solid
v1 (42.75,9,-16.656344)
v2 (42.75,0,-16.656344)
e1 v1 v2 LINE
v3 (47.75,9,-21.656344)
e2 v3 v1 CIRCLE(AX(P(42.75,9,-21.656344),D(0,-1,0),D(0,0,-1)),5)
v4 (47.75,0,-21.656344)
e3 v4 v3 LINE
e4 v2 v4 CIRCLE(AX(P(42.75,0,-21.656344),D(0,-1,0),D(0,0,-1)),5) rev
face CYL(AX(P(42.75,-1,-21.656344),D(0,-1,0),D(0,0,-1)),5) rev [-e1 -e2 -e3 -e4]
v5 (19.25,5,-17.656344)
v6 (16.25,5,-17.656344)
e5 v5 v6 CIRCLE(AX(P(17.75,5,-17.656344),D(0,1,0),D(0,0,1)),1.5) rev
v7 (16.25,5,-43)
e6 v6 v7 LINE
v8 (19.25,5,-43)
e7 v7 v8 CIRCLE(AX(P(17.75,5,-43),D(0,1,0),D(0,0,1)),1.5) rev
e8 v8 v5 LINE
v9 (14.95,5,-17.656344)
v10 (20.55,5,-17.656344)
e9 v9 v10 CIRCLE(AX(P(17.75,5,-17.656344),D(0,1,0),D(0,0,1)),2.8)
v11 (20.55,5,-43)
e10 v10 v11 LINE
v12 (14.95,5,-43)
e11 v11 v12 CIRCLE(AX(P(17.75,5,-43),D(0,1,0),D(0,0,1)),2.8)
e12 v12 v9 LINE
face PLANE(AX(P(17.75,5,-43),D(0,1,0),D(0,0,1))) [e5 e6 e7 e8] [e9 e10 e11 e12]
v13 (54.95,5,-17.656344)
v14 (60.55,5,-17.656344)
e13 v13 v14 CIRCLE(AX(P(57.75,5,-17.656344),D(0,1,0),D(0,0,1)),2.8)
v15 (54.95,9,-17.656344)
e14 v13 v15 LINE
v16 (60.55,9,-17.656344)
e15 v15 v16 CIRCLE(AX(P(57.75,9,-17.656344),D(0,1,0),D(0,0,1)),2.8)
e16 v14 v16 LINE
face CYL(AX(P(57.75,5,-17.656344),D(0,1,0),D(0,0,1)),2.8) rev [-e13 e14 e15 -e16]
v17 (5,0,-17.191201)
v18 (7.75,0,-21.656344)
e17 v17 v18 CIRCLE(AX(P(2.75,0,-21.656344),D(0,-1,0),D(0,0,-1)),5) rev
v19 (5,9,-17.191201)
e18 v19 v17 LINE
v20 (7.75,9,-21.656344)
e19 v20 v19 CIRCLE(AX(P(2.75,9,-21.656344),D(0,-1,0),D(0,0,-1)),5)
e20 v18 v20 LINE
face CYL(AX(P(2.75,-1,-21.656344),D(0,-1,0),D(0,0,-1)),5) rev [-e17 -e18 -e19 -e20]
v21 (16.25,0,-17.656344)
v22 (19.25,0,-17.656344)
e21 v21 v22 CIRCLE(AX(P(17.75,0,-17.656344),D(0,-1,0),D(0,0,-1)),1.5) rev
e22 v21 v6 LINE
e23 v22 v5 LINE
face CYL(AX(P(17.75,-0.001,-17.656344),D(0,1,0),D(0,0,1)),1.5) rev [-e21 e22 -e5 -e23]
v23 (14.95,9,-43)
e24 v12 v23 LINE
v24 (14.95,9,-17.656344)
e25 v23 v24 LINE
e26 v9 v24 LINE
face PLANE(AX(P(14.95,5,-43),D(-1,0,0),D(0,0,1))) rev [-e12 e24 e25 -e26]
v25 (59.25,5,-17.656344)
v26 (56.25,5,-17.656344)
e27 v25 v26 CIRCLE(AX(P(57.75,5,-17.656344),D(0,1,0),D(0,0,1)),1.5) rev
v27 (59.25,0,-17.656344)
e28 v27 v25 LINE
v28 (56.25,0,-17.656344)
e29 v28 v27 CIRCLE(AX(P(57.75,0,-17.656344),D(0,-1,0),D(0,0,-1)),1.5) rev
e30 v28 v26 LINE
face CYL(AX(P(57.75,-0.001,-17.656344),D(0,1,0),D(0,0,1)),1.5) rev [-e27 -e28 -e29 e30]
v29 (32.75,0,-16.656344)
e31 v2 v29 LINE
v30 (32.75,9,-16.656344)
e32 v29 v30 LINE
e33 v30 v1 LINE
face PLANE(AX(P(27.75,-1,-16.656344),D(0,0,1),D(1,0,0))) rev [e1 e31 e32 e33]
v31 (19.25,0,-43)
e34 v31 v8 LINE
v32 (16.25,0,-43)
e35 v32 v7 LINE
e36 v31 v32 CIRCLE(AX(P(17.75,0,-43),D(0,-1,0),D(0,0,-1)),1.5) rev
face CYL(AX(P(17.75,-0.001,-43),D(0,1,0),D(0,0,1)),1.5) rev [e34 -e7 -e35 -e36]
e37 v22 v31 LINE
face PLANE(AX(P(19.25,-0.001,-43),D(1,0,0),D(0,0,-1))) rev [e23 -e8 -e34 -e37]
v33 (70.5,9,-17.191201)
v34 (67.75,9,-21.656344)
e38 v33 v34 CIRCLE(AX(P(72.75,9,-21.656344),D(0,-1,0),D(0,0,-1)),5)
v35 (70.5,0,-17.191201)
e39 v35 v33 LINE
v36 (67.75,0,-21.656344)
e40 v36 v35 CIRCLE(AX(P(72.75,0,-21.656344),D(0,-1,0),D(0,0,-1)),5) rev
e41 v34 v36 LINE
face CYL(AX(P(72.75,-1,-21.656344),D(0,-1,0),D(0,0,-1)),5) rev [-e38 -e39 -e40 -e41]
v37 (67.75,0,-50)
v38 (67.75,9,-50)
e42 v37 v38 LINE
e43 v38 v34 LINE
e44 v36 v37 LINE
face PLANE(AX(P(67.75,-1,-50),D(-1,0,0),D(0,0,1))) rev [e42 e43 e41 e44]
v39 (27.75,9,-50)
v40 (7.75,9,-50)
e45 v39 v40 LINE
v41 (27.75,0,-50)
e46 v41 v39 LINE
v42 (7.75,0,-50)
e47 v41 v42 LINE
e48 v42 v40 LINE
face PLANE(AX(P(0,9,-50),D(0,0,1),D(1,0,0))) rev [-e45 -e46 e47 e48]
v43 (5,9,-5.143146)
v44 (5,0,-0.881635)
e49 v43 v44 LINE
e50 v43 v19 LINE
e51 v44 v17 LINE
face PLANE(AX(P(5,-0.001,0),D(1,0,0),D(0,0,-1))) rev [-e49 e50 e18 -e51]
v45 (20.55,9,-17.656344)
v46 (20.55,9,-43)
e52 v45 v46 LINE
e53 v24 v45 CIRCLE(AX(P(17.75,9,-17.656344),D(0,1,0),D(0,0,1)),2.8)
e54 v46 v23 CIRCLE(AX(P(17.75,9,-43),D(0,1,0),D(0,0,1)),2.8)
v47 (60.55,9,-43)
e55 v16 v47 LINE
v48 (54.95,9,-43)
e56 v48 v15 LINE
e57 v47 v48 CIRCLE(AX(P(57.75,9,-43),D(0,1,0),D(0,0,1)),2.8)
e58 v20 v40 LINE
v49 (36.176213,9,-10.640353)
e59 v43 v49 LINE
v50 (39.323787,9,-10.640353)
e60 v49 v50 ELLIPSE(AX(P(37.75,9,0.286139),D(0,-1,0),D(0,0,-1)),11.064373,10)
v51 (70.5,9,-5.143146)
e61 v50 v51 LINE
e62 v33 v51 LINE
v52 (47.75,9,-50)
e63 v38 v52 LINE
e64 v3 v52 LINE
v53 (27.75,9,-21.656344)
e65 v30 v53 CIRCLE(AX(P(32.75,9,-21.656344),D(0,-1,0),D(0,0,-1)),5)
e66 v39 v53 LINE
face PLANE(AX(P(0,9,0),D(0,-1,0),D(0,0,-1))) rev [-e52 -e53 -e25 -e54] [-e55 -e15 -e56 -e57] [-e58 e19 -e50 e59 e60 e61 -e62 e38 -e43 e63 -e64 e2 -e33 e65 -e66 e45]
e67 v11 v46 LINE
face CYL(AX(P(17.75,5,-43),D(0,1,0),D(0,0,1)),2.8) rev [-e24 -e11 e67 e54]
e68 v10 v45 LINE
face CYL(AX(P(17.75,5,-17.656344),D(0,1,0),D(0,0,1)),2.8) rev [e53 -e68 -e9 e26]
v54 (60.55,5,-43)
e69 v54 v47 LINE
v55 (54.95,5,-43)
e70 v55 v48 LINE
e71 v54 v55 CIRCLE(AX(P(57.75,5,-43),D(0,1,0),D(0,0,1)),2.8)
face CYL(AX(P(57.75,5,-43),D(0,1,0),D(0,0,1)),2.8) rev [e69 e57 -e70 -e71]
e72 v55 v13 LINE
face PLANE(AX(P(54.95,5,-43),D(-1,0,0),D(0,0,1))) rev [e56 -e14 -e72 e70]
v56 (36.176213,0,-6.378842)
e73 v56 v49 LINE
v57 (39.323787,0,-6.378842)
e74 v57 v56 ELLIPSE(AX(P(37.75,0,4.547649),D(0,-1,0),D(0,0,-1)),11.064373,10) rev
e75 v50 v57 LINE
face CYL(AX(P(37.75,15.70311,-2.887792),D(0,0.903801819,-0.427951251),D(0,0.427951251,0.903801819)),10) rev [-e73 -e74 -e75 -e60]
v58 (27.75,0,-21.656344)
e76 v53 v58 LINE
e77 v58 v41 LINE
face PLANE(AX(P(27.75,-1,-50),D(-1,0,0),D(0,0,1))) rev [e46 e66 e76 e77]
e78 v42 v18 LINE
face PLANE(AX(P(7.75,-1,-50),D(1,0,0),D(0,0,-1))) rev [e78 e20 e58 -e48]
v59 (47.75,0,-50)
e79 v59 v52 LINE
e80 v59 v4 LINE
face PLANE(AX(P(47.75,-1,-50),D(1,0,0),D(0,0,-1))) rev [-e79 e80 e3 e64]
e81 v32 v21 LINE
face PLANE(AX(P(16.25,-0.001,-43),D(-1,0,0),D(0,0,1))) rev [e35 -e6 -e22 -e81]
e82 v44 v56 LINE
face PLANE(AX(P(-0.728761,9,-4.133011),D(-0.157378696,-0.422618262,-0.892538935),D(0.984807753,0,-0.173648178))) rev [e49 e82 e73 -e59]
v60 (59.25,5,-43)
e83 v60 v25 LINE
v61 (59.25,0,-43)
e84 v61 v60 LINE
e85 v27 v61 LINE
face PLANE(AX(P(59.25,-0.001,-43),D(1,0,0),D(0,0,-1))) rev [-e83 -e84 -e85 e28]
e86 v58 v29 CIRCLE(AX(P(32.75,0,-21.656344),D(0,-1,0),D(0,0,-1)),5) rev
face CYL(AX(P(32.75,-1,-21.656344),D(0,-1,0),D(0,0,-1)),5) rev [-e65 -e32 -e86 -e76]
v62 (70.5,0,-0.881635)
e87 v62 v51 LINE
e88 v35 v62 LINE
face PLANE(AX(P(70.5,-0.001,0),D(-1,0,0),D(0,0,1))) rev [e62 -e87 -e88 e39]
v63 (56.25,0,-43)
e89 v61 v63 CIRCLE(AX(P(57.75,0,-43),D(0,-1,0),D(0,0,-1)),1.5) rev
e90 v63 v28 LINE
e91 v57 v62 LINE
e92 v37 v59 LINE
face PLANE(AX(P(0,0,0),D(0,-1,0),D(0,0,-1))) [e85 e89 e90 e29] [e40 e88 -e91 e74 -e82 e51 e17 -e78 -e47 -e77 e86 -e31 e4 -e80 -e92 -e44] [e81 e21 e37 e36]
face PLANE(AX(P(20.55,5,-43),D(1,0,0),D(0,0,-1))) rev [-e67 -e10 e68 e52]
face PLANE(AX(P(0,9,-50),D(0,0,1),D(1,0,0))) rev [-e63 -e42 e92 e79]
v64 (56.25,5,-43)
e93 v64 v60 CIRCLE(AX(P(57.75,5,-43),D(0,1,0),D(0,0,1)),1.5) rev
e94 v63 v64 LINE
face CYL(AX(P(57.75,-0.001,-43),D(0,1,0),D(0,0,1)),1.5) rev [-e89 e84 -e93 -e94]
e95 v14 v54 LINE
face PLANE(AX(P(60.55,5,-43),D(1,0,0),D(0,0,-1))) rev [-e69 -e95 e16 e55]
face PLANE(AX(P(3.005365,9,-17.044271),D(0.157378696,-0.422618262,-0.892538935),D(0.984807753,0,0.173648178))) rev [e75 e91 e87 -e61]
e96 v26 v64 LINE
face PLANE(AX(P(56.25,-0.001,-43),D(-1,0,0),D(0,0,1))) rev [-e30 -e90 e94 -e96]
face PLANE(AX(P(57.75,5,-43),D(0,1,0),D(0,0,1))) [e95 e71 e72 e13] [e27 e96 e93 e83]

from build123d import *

# Parameters (mm, degrees)
BOSS_EXTRUDE1_DEPTH = 9
CUT_EXTRUDE2_REACH  = 93.001
SKETCH5_W           = 20
SKETCH5_H           = 33.343656478
SKETCH5_W_2         = 7.75
CUT_EXTRUDE3_DEPTH  = 10
FILLET1_R           = 5
CUT_EXTRUDE4_DEPTH  = 4
CHAMFER1_SIZE       = 9
CHAMFER1_SIZE_2     = 4.196768923
FILLET2_R           = 10
CUT_EXTRUDE5_REACH  = 93.001
SKETCH7_W           = 5
SKETCH7_H           = 18.120809616


with BuildPart() as part:
    # Sketch1 → Boss-Extrude1 (new body)
    with BuildSketch(Plane(origin=(0, 0, 0), x_dir=(1, 0, 0), z_dir=(0, 1, 0))):
        Polygon((0, 0), (0, 50), (75.5, 50), (75.5, 0), (37.75, 6.656343522), align=None)
    extrude(amount=BOSS_EXTRUDE1_DEPTH)

    # Sketch4 → Cut-Extrude2 (cut, up to next)
    with BuildSketch(Plane(origin=(0, 9, 0), x_dir=(1, 0, 0), z_dir=(0, 1, 0)), mode=Mode.PRIVATE) as cut_extrude2_sk1:
        with BuildLine():
            Line((19.25, 43), (19.25, 17.656343522))
            ThreePointArc((19.25, 17.656343522), (17.75, 16.156343522), (16.25, 17.656343522))
            Line((16.25, 17.656343522), (16.25, 43))
            ThreePointArc((16.25, 43), (17.75, 44.5), (19.25, 43))
        make_face()
    cut_extrude2_tool1 = extrude(cut_extrude2_sk1.sketch, amount=-CUT_EXTRUDE2_REACH, mode=Mode.PRIVATE) & part.part
    # Sketch4 → Cut-Extrude2 (cut, up to next)
    with BuildSketch(Plane(origin=(0, 9, 0), x_dir=(1, 0, 0), z_dir=(0, 1, 0)), mode=Mode.PRIVATE) as cut_extrude2_sk2:
        with BuildLine():
            Line((59.25, 43), (59.25, 17.656343522))
            ThreePointArc((59.25, 17.656343522), (57.75, 16.156343522), (56.25, 17.656343522))
            Line((56.25, 17.656343522), (56.25, 43))
            ThreePointArc((56.25, 43), (57.75, 44.5), (59.25, 43))
        make_face()
    cut_extrude2_tool2 = extrude(cut_extrude2_sk2.sketch, amount=-CUT_EXTRUDE2_REACH, mode=Mode.PRIVATE) & part.part
    add(cut_extrude2_tool1.solids().sort_by_distance((17.75, 9, -30.328172))[0], mode=Mode.SUBTRACT)
    add(cut_extrude2_tool2.solids().sort_by_distance((57.75, 9, -30.328172))[0], mode=Mode.SUBTRACT)

    # Sketch5 → Cut-Extrude3 (cut)
    with BuildSketch(Plane(origin=(0, 9, 0), x_dir=(1, 0, 0), z_dir=(0, 1, 0))):
        with Locations((37.75, 33.328171761)):
            Rectangle(SKETCH5_W, SKETCH5_H)
        with Locations((71.625, 33.328171761)):
            Rectangle(SKETCH5_W_2, SKETCH5_H)
        with Locations((3.875, 33.328171761)):
            Rectangle(SKETCH5_W_2, SKETCH5_H)
    extrude(amount=-CUT_EXTRUDE3_DEPTH, mode=Mode.SUBTRACT)

    # Fillet1
    fillet1_edges = [part.edges().sort_by_distance(p)[0] for p in [
        (27.75, 4.5, -16.656343522),
        (47.75, 4.5, -16.656343522),
        (7.75, 4.5, -16.656343522),
        (67.75, 4.5, -16.656343522),
    ]]
    fillet(fillet1_edges, radius=FILLET1_R)

    # Sketch6 → Cut-Extrude4 (cut)
    with BuildSketch(Plane(origin=(0, 9, 0), x_dir=(1, 0, 0), z_dir=(0, 1, 0))):
        with BuildLine():
            Line((20.55, 43), (20.55, 17.656343522))
            ThreePointArc((20.55, 17.656343522), (17.75, 14.856343522), (14.95, 17.656343522))
            Line((14.95, 17.656343522), (14.95, 43))
            ThreePointArc((14.95, 43), (17.75, 45.8), (20.55, 43))
        make_face()
        with BuildLine():
            Line((60.55, 43), (60.55, 17.656343522))
            ThreePointArc((60.55, 17.656343522), (57.75, 14.856343522), (54.95, 17.656343522))
            Line((54.95, 17.656343522), (54.95, 43))
            ThreePointArc((54.95, 43), (57.75, 45.8), (60.55, 43))
        make_face()
    extrude(amount=-CUT_EXTRUDE4_DEPTH, mode=Mode.SUBTRACT)

    # Chamfer1
    # the kernel refuses this chamfer: 9, 4.196768923 mm, written as the material it takes off along each edge
    with BuildSketch(Plane(origin=(98.464514589, 9, 4.049263521), x_dir=(-0.0028324039269935573, -0.9998669641130703, 0.01606336089697195), z_dir=(-0.9848077530122074, 0, -0.17364817766693472))) as chamfer1_piece_1_section:
        Polygon((CHAMFER1_SIZE * 0.999866964113, -CHAMFER1_SIZE * 0.0163111641311), (-CHAMFER1_SIZE_2 * 0.0163111641326, -CHAMFER1_SIZE_2 * 0.999866964207), (0, 0), align=None)
    chamfer1_piece_1 = extrude(amount=84.969913084, mode=Mode.PRIVATE)
    chamfer1_piece_1 = split(chamfer1_piece_1, bisect_by=Plane(origin=(68.314499837, 5.890721228, -12.045689495), z_dir=(0.17364817766693472, 0, 0.9848077530122074)), keep=Keep.TOP, mode=Mode.PRIVATE)
    add(chamfer1_piece_1, mode=Mode.SUBTRACT)
    with BuildSketch(Plane(origin=(60.714514589, 9, -10.705607043), x_dir=(0.0028324039269935768, -0.9998669641130703, 0.016063360896972065), z_dir=(-0.9848077530122074, 0, 0.17364817766693472))) as chamfer1_piece_2_section:
        Polygon((CHAMFER1_SIZE * 0.999866964113, -CHAMFER1_SIZE * 0.0163111641311), (-CHAMFER1_SIZE_2 * 0.0163111641326, -CHAMFER1_SIZE_2 * 0.999866964207), (0, 0), align=None)
    chamfer1_piece_2 = extrude(amount=84.969913084, mode=Mode.PRIVATE)
    chamfer1_piece_2 = split(chamfer1_piece_2, bisect_by=Plane(origin=(7.185500163, 5.890721228, -12.045689495), z_dir=(-0.17364817766693472, 0, 0.9848077530122074)), keep=Keep.TOP, mode=Mode.PRIVATE)
    add(chamfer1_piece_2, mode=Mode.SUBTRACT)
    with BuildSketch(Plane(origin=(98.464514589, 9, 4.049263521), x_dir=(-0.0028324039269935573, -0.9998669641130703, 0.01606336089697195), z_dir=(-0.9848077530122074, 0, -0.17364817766693472))) as chamfer1_piece_3a_section:
        Polygon((CHAMFER1_SIZE * 0.999866964113, -CHAMFER1_SIZE * 0.0163111641311), (-CHAMFER1_SIZE_2 * 0.0163111641326, -CHAMFER1_SIZE_2 * 0.999866964207), (0, 0), align=None)
    chamfer1_piece_3a = extrude(amount=84.969913084, mode=Mode.PRIVATE)
    chamfer1_piece_3a = split(chamfer1_piece_3a, bisect_by=Plane(origin=(29.282530451, 6.096120999, -5.163300182), z_dir=(-0.17364817766693472, 0, -0.9848077530122074)), keep=Keep.TOP, mode=Mode.PRIVATE)
    with BuildSketch(Plane(origin=(60.714514589, 9, -10.705607043), x_dir=(0.0028324039269935768, -0.9998669641130703, 0.016063360896972065), z_dir=(-0.9848077530122074, 0, 0.17364817766693472))) as chamfer1_piece_3b_section:
        Polygon((CHAMFER1_SIZE * 0.999866964113, -CHAMFER1_SIZE * 0.0163111641311), (-CHAMFER1_SIZE_2 * 0.0163111641326, -CHAMFER1_SIZE_2 * 0.999866964207), (0, 0), align=None)
    chamfer1_piece_3b = extrude(amount=84.969913084, mode=Mode.PRIVATE)
    chamfer1_piece_3b = split(chamfer1_piece_3b, bisect_by=Plane(origin=(46.217469549, 6.096120999, -5.163300182), z_dir=(0.17364817766693472, 0, -0.9848077530122074)), keep=Keep.TOP, mode=Mode.PRIVATE)
    chamfer1_piece_3 = chamfer1_piece_3a & chamfer1_piece_3b
    add(chamfer1_piece_3, mode=Mode.SUBTRACT)

    # Fillet2
    fillet2_edges = [part.edges().sort_by_distance(p)[0] for p in [
        (37.75, 4.5, -8.787098946),
    ]]
    fillet(fillet2_edges, radius=FILLET2_R)

    # Sketch7 → Cut-Extrude5 (cut, up to next)
    with BuildSketch(Plane(origin=(0, 9, 0), x_dir=(1, 0, 0), z_dir=(0, 1, 0)), mode=Mode.PRIVATE) as cut_extrude5_sk1:
        with Locations((2.5, 9.060404808)):
            Rectangle(SKETCH7_W, SKETCH7_H)
    cut_extrude5_tool1 = extrude(cut_extrude5_sk1.sketch, amount=-CUT_EXTRUDE5_REACH, mode=Mode.PRIVATE) & part.part
    # Sketch7 → Cut-Extrude5 (cut, up to next)
    with BuildSketch(Plane(origin=(0, 9, 0), x_dir=(1, 0, 0), z_dir=(0, 1, 0)), mode=Mode.PRIVATE) as cut_extrude5_sk2:
        with Locations((73, 9.060404808)):
            Rectangle(SKETCH7_W, SKETCH7_H)
    cut_extrude5_tool2 = extrude(cut_extrude5_sk2.sketch, amount=-CUT_EXTRUDE5_REACH, mode=Mode.PRIVATE) & part.part
    add(cut_extrude5_tool1.solids().sort_by_distance((2.5, 9, -9.060405))[0], mode=Mode.SUBTRACT)
    add(cut_extrude5_tool2.solids().sort_by_distance((73, 9, -9.060405))[0], mode=Mode.SUBTRACT)


solid = part.part
